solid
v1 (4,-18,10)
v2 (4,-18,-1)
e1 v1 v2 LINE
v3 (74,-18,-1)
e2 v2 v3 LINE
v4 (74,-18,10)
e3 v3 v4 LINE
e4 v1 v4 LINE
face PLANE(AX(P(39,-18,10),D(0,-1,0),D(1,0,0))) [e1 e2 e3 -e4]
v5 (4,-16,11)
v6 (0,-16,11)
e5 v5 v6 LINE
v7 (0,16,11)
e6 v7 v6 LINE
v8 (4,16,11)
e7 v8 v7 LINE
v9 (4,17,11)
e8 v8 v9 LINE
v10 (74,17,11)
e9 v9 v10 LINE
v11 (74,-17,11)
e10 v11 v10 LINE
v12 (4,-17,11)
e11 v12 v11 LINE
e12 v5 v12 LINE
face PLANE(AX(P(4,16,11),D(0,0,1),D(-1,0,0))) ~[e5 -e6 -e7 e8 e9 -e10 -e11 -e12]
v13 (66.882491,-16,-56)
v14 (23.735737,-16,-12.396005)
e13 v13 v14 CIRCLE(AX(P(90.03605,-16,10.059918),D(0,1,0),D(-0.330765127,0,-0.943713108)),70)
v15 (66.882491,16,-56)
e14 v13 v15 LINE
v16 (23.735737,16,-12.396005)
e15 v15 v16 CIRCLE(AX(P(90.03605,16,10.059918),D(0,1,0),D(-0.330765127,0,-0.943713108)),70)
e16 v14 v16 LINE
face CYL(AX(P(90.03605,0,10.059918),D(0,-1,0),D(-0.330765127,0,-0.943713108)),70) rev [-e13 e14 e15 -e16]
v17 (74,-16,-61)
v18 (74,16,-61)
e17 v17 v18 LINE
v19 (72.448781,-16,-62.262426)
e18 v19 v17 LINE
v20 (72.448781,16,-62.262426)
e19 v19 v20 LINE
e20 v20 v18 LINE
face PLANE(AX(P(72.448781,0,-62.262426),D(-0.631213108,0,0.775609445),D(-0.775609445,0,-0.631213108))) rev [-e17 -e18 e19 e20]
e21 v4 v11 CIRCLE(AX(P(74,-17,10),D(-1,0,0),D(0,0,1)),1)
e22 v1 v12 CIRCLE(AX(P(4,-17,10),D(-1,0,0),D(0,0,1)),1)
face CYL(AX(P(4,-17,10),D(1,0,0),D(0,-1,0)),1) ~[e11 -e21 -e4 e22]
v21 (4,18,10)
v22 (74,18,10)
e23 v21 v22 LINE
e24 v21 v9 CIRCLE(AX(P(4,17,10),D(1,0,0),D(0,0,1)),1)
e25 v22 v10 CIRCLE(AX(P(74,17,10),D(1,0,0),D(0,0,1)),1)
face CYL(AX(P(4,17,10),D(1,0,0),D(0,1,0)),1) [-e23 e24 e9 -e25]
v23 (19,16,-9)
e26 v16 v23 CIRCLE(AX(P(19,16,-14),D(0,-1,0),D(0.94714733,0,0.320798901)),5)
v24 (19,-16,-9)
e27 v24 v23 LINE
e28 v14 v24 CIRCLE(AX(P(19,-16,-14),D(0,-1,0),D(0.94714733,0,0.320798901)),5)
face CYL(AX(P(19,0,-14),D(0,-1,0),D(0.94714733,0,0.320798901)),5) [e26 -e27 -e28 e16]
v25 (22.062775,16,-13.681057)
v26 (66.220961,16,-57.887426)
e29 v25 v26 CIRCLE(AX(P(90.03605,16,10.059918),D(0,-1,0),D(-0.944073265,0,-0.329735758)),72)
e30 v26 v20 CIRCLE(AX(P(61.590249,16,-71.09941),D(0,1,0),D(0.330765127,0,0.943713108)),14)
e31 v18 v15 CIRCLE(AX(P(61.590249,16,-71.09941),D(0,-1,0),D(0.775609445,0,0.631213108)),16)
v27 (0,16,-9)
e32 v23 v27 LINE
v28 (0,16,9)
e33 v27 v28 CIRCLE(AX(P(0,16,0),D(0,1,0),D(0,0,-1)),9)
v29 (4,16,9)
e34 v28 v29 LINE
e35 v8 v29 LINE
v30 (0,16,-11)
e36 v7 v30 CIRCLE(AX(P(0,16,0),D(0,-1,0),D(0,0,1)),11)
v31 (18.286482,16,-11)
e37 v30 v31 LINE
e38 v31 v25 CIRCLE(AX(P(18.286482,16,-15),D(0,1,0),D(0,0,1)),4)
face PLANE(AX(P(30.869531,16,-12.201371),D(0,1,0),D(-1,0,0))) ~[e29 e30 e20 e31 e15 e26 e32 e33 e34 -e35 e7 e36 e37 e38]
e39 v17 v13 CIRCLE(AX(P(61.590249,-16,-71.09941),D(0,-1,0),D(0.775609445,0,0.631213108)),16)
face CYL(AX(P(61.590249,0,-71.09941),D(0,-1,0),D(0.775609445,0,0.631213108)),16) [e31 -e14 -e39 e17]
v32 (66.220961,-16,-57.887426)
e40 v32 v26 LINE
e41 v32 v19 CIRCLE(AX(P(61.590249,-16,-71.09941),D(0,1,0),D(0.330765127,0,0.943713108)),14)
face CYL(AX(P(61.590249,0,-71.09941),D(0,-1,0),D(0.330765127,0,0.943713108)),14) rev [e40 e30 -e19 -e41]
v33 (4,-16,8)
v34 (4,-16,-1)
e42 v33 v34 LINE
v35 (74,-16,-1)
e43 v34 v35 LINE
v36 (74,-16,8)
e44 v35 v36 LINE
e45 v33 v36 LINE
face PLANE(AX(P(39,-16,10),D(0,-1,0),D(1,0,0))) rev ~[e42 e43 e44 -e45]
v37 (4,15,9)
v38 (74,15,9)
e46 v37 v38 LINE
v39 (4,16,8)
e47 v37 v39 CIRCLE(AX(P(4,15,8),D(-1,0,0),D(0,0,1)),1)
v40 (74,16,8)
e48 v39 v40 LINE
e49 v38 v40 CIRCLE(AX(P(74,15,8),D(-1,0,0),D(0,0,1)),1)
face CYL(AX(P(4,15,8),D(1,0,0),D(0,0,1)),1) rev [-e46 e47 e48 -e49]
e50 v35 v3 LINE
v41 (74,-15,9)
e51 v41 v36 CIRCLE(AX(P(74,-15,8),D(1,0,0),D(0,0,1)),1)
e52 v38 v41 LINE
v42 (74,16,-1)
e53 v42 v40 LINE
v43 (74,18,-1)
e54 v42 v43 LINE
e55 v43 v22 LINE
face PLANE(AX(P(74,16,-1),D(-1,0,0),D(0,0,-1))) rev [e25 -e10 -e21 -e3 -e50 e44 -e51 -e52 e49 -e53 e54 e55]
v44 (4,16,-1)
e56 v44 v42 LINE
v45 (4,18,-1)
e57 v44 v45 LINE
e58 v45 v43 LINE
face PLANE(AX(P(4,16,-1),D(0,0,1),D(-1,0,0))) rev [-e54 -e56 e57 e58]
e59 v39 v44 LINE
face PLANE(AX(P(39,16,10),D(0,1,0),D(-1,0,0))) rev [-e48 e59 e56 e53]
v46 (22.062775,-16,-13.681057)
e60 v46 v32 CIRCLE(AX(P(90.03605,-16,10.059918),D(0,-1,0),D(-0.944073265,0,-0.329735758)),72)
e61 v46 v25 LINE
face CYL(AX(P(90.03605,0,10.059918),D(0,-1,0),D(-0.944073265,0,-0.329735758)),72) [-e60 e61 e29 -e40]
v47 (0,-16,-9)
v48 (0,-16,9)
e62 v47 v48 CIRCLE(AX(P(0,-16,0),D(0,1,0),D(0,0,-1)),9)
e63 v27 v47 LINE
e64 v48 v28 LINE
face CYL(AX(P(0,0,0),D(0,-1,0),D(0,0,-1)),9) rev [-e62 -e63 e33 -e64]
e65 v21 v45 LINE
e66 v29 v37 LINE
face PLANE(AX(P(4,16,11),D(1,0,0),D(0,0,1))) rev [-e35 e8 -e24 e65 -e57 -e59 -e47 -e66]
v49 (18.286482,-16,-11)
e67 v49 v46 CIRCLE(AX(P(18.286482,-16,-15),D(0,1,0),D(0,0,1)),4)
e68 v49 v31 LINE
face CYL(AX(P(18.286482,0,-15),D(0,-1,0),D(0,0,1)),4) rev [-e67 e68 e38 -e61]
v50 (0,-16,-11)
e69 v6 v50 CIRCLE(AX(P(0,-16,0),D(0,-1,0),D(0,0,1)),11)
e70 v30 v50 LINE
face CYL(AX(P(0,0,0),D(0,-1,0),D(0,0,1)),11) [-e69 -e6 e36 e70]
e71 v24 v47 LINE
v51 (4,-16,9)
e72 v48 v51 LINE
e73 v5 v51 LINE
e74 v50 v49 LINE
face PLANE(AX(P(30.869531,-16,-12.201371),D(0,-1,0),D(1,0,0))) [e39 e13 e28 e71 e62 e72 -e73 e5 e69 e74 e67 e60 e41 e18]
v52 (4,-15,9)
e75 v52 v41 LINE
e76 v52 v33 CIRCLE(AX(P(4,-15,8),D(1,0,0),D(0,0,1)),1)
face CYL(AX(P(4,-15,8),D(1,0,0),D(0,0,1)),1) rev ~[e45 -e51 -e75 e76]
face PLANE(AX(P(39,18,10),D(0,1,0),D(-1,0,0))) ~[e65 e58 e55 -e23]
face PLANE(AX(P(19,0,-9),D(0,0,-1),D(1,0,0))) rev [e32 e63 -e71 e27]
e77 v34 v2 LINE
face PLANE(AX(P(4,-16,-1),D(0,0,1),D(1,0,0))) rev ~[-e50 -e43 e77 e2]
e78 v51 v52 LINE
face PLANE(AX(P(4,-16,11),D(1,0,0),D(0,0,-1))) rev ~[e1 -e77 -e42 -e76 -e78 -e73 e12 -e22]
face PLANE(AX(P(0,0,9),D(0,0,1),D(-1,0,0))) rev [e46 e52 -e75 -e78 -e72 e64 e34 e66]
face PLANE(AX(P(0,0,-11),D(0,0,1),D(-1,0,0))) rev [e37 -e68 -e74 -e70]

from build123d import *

# Parameters (mm, degrees)
F1_DEPTH = 16
F2_W     = 70
F2_H     = 2
F2_H_2   = 10
F3_DEPTH = 2
F4_R     = 1


with BuildPart() as f1:
    # F0 (on Front) → F1 (new body)
    with BuildSketch(Plane.XZ):
        with BuildLine():
            ThreePointArc((0, -9), (-9, 0), (0, 9))
            Line((0, 9), (74, 9))
            Line((74, 9), (74, 11))
            Line((74, 11), (0, 11))
            ThreePointArc((0, 11), (-11, 0), (0, -11))
            Line((0, -11), (18.2864816057, -11))
            ThreePointArc((18.2864816057, -11), (20.6021054823, -11.7384227646), (22.0627746665, -13.6810569689))
            ThreePointArc((22.0627746665, -13.6810569689), (39.0966080524, -40.824002055), (66.2209606463, -57.8874262169))
            ThreePointArc((66.2209606463, -57.8874262169), (69.6378774832, -59.6435957626), (72.4487811093, -62.2624262169))
            Line((72.4487811093, -62.2624262169), (74, -61))
            ThreePointArc((74, -61), (70.7875387131, -58.0070509094), (66.8824908995, -56))
            ThreePointArc((66.8824908995, -56), (40.2783781222, -39.1759850939), (23.7357366507, -12.396005494))
            ThreePointArc((23.7357366507, -12.396005494), (21.9137628138, -9.9367517594), (19, -9))
            Line((19, -9), (0, -9))
        make_face()
    extrude(amount=F1_DEPTH)

    # F2 (on face) → F3 (join)
    with BuildSketch(Plane.XZ.offset(16)):
        with Locations((39, 10)):
            Rectangle(F2_W, F2_H)
        with Locations((39, 4)):
            Rectangle(F2_W, F2_H_2)
    extrude(amount=F3_DEPTH)

    # F4
    f4_edges = [f1.edges().sort_by_distance(p)[0] for p in [
        (39, -18, 11),
        (39, -16, 9),
    ]]
    fillet(f4_edges, radius=F4_R)

    # F5: F1 across plane


with BuildPart() as f1_1:
    add(f1.part)
    add(f1.part.mirror(Plane.XZ))


solid = f1_1.part
